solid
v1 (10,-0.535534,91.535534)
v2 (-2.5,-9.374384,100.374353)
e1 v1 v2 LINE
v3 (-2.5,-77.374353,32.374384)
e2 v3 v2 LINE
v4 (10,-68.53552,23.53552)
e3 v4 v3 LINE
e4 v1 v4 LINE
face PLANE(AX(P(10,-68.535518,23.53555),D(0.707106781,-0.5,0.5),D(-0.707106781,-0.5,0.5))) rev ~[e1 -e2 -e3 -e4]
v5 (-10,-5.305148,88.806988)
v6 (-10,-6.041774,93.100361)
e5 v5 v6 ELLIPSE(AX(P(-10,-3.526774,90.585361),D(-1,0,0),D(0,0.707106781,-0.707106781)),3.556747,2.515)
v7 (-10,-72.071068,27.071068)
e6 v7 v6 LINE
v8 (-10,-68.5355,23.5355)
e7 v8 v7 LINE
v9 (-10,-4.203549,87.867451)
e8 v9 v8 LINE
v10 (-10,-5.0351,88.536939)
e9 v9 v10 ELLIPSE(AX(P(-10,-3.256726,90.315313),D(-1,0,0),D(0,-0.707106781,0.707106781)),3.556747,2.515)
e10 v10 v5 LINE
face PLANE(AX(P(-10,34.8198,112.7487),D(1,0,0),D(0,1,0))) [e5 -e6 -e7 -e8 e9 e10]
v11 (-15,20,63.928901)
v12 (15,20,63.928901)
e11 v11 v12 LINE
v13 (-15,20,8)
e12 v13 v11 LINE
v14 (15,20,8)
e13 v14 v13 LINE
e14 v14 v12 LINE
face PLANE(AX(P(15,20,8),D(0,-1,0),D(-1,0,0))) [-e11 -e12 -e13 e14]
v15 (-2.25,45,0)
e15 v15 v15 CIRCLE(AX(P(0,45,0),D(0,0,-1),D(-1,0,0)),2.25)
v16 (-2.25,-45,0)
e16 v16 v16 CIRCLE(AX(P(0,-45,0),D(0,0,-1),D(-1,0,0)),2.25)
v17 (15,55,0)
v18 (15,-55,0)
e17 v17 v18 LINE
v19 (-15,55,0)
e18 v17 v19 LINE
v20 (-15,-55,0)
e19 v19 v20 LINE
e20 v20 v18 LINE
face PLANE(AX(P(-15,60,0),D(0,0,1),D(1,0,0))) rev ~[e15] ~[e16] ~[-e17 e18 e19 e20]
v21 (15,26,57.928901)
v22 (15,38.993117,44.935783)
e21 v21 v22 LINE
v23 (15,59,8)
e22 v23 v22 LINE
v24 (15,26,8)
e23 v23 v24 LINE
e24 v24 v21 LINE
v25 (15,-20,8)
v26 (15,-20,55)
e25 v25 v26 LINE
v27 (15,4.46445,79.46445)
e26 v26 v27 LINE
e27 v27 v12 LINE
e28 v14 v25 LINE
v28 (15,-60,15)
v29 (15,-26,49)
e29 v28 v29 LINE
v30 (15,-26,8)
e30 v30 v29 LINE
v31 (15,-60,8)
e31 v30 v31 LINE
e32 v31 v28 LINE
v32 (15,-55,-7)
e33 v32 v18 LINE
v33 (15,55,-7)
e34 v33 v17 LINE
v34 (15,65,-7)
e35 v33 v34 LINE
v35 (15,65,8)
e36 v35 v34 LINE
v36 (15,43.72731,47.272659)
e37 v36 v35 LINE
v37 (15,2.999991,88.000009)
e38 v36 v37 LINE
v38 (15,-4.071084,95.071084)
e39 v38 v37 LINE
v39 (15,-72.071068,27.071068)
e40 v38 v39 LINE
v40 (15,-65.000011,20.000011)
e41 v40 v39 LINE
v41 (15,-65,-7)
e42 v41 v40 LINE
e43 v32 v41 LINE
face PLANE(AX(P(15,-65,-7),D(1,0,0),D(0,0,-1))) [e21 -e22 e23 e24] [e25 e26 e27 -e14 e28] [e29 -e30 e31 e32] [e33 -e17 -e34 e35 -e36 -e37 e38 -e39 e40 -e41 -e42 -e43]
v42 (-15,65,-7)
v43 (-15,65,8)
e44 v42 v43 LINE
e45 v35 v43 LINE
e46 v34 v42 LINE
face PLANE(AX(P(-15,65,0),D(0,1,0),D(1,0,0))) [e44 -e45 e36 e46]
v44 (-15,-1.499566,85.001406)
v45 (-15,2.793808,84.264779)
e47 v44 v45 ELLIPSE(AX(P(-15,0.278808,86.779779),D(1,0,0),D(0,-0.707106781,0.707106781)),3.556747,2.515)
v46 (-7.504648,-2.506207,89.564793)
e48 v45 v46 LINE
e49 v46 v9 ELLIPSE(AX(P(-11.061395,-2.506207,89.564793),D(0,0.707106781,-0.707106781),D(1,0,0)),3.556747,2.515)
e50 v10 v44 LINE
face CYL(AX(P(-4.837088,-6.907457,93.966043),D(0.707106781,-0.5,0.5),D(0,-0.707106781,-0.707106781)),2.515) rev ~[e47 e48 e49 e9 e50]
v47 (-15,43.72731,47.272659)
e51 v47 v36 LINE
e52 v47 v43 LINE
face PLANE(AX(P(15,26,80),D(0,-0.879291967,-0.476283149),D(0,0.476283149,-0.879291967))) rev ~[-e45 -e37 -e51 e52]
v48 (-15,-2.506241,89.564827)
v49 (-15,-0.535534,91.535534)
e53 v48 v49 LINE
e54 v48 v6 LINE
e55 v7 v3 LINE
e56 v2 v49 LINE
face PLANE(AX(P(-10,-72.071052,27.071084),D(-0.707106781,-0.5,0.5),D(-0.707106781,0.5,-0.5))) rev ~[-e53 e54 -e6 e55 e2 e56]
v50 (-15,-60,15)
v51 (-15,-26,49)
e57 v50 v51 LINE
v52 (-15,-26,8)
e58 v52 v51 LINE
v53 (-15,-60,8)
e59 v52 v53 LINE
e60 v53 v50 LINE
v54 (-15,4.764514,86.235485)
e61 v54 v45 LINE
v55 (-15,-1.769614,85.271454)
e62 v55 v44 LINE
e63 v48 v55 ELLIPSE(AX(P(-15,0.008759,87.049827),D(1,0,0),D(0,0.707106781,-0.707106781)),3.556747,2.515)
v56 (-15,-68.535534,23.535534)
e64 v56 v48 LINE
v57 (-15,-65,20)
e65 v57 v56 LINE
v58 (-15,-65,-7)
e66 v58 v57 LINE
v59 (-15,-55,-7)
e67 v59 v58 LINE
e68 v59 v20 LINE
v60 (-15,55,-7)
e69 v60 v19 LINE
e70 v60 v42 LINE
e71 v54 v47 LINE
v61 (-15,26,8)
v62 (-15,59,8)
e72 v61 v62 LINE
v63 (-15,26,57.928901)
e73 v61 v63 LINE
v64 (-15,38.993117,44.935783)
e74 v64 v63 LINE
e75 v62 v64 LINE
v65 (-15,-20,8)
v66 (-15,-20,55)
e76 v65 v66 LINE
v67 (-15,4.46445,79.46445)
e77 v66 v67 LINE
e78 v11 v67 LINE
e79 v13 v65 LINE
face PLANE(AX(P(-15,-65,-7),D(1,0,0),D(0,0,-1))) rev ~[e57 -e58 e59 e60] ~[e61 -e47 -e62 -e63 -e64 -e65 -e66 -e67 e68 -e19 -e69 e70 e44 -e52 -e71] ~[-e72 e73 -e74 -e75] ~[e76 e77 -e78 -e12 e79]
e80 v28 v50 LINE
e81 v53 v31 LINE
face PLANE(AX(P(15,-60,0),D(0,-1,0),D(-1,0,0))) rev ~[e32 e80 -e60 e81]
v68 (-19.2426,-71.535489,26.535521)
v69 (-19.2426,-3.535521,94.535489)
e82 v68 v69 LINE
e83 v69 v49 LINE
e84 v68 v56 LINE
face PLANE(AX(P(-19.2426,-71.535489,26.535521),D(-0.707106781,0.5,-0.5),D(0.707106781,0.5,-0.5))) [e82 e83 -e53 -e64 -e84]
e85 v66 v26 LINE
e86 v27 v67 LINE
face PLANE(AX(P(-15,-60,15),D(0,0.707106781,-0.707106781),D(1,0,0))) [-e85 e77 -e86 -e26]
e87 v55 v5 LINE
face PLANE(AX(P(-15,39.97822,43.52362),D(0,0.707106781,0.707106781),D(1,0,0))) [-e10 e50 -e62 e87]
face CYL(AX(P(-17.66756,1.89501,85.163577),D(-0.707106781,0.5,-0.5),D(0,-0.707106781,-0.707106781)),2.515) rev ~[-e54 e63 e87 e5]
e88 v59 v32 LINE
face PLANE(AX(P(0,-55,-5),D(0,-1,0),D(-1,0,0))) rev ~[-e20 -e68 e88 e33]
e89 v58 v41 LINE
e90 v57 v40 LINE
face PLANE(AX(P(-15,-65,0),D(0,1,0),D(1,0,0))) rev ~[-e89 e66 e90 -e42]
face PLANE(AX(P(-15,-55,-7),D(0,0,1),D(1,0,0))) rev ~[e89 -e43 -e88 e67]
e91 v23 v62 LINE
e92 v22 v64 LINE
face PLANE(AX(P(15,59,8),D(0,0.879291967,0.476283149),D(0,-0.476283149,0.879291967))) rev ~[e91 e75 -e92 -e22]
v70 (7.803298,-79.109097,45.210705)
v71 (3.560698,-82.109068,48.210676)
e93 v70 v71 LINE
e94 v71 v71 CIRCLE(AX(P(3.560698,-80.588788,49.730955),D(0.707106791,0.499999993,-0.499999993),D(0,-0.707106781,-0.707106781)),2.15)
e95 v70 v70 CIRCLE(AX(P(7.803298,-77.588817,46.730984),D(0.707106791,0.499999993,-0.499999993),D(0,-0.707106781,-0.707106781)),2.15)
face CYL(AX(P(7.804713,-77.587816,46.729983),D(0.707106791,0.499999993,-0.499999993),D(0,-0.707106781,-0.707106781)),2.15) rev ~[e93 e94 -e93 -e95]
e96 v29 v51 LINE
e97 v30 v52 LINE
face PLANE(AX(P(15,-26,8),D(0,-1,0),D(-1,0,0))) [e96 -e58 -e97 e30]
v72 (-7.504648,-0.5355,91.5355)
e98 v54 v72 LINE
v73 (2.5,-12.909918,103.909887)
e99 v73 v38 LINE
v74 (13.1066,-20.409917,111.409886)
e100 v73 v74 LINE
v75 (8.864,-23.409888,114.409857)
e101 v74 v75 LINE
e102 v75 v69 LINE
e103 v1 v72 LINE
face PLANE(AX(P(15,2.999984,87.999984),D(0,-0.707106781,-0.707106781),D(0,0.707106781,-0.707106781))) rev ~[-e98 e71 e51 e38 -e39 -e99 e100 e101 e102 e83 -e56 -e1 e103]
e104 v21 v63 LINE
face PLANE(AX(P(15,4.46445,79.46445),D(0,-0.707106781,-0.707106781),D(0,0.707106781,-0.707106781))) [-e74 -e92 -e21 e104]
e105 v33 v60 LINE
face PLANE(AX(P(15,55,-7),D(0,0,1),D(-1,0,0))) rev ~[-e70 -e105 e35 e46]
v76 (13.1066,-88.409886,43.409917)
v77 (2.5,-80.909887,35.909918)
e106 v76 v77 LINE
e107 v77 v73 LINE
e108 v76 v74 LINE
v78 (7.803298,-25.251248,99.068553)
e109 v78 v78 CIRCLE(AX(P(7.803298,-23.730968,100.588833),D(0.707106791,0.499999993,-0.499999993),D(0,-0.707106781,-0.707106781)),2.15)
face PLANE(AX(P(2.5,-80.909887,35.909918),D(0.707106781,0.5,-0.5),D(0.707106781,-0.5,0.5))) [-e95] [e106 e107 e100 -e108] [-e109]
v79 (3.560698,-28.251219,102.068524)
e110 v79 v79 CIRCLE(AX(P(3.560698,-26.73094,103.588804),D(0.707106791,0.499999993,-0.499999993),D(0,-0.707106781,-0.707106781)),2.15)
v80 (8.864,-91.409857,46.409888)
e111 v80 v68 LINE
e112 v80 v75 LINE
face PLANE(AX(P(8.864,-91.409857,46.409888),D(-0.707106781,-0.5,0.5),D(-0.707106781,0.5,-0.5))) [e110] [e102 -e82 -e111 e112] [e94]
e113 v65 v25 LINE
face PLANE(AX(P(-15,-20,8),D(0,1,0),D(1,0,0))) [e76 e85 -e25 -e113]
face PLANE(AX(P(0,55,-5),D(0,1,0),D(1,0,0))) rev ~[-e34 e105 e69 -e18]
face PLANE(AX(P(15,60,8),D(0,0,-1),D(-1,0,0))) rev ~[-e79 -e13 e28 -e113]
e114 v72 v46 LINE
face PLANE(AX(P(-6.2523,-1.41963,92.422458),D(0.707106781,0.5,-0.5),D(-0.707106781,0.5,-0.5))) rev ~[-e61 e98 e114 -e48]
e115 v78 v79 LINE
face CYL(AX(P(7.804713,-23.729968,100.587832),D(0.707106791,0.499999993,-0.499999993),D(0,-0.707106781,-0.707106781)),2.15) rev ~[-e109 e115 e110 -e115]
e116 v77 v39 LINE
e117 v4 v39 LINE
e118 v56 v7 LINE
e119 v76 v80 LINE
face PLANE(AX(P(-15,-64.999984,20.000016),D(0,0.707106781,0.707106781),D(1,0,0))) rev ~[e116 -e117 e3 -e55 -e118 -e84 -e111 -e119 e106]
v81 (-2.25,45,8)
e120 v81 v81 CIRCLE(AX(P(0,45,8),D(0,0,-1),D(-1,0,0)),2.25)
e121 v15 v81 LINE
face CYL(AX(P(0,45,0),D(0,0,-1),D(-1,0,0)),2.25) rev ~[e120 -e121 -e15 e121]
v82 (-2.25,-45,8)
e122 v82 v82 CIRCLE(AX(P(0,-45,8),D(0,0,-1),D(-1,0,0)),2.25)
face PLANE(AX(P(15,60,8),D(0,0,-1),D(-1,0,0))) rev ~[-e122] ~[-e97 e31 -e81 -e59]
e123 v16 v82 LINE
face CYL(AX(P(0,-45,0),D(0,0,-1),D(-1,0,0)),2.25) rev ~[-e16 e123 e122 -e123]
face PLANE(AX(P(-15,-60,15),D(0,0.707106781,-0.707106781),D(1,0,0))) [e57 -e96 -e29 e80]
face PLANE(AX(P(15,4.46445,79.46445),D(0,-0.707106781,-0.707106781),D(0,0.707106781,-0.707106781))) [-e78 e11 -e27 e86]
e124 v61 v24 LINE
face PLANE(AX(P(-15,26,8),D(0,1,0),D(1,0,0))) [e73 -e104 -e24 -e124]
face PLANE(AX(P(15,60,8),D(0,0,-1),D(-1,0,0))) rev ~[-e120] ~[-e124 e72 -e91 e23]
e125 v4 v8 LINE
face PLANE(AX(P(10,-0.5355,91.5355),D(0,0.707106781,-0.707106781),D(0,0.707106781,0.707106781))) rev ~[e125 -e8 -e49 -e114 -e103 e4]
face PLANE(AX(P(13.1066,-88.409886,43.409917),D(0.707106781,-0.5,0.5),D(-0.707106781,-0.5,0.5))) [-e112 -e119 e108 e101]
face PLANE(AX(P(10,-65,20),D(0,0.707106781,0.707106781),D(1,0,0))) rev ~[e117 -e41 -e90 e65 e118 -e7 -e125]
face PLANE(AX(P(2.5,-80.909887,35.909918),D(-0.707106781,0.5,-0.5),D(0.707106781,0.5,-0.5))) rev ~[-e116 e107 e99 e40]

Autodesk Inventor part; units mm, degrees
ref_plane "YZ Plane" through (0, 0, 0) normal (1, 0, 0) x (0, 1, 0)
ref_plane "XZ Plane" through (0, 0, 0) normal (0, 1, 0) x (-1, 0, 0)
ref_plane "XY Plane" through (0, 0, 0) normal (0, 0, 1) x (1, 0, 0)
ref_plane "Arbeitsebene1" through (0, 0, 0) normal (0, 0, 1) x (1, 0, 0)
sketch "Skizze1" plane through (0, 0, 0) normal (0, 0, 1) x (1, 0, 0)
  line L0 (15, 55) -> (-15, 55) projected
  line L1 (-15, 55) -> (-15, -55) projected
  line L2 (-15, -55) -> (15, -55) projected
  line L3 (15, -55) -> (15, 55) projected
  circle A0 centre (0, 45) radius 5 projected
  circle A1 centre (0, -45) radius 5 projected
  line L4 (15, 55) -> (-15, 55) projected
  line L5 (-15, 55) -> (-15, -55) projected
  line L6 (-15, -55) -> (15, -55) projected
  line L7 (15, -55) -> (15, 55) projected
  circle A2 centre (0, 45) radius 5 projected
  circle A3 centre (0, -45) radius 5 projected
  point P0 (0, 0)
ref_plane "Arbeitsebene2" through (0, -55, -5) normal (0, -1, 0) x (-1, 0, 0)
sketch "Skizze2" plane through (0, -55, -5) normal (0, -1, 0) x (-1, 0, 0)
  line L0 (15, 2) -> (-15, 2) projected
  line L1 (-15, 2) -> (-15, -2) projected
  line L2 (-15, -2) -> (-15, -5) projected
  line L3 (15, -5) -> (-15, -5) projected
  line L4 (15, 2) -> (15, -5) projected
  point P0 (0, -5)
extrude "Extrusion1" add sketch "Skizze2" along normal blind 10
sketch "Skizze3" plane through (-15, -55, 0) normal (0, 0, 1) x (1, 0, 0)
  line L0 (0, -10) -> (30, -10) projected
  line L1 (30, 0) -> (30, -10) projected
  line L2 (0, -10) -> (30, -10)
  line L3 (30, -10) -> (30, -5)
  line L4 (30, -5) -> (0, -5)
  line L5 (0, -5) -> (0, -10)
  point P0 (15, 55)
  dimension "d2" = 5
ref_plane "Arbeitsebene3" through (0, 55, -5) normal (0, 1, 0) x (1, 0, 0)
sketch "Skizze4" plane through (0, 55, -5) normal (0, 1, 0) x (1, 0, 0)
  line L0 (15, 2) -> (15, -5) projected
  line L1 (15, 2) -> (-15, 2) projected
  line L2 (-15, 2) -> (-15, -5) projected
  line L3 (15, -5) -> (-15, -5) projected
  point P0 (0, -5)
extrude "Extrusion2" add sketch "Skizze4" along normal blind 10
sketch "Skizze5" plane through (-15, 55, 0) normal (0, 0, 1) x (1, 0, 0)
  line L0 (0, 10) -> (30, 10) projected
  line L1 (0, 0) -> (0, 10) projected
  line L2 (30, 10) -> (0, 10)
  line L3 (0, 10) -> (0, 5)
  line L4 (0, 5) -> (30, 5)
  line L5 (30, 5) -> (30, 10)
  point P0 (15, -55)
  dimension "d5" = 5
extrude "Extrusion3" add sketch "Skizze3" along normal blind 20
sketch "Skizze6" plane through (15, -55, 0) normal (1, 0, 0) x (0, 0, -1)
  line L0 (7, -10) -> (-20, -10) projected
  line L1 (-20, -10) -> (-15, -5)
  line L2 (0, -5) -> (-20, -5) projected
  line L3 (-20, -10) -> (-12.9289, -10) construction
  line L4 (-20, -5) -> (-20, -10)
  point P0 (0, 55)
  dimension "d8" = 45
extrude "Extrusion4" cut sketch "Skizze6" against normal blind 46
sketch "Skizze7" plane through (-15, -60, 15) normal (0, 0.7071068, 0.7071068) x (1, 0, 0)
  line L0 (0, -7.0711) -> (0, 0) projected
  line L1 (0, -7.0711) -> (30, -7.0711) projected
  line L2 (30, 0) -> (30, -7.0711) projected
  line L3 (0, 0) -> (30, 0) projected
  point P0 (15, 53.033)
extrude "Extrusion5" add sketch "Skizze7" along normal blind 166
extrude "Extrusion6" add sketch "Skizze5" along normal blind 166
sketch "Skizze8" plane through (-15, 60, 0) normal (0, -1, 0) x (1, 0, 0)
  line L0 (30, 0) -> (0, 0) projected
  line L1 (30, 0) -> (30, 166) projected
  line L2 (0, 166) -> (30, 166) projected
  line L3 (0, 0) -> (0, 166) projected
  line L4 (0, 0) -> (0, 80)
  line L5 (0, 0) -> (0, 166) projected
  line L6 (0, 80) -> (30, 80)
  line L7 (0, 80) -> (30, 80)
  line L8 (30, 80) -> (30, 88)
  line L9 (30, 88) -> (0, 88)
  line L10 (0, 88) -> (0, 80)
  point P0 (15, 0)
  dimension "d15" = 80
  dimension "d16" = 8
extrude "Extrusion7" add sketch "Skizze8" along normal blind 57 contours L6 L3 L9 L1
sketch "Skizze9" plane through (-15, -65, -7) normal (-1, 0, 0) x (0, 0, 1)
  line L0 (27, 0) -> (144.3797, 117.3797) projected
  line L1 (139.3797, 122.3797) -> (144.3797, 117.3797) projected
  line L2 (95, 78) -> (139.3797, 122.3797) projected
  line L3 (95, 125) -> (95, 78) projected
  line L4 (95, 125) -> (173, 125) projected
  line L5 (173, 130) -> (173, 125) projected
  line L6 (0, 130) -> (173, 130) projected
  line L7 (0, 120) -> (0, 130) projected
  line L8 (0, 120) -> (7, 120) projected
  line L9 (7, 120) -> (7, 125) projected
  line L10 (7, 125) -> (87, 125) projected
  line L11 (87, 125) -> (87, 70) projected
  line L12 (22, 5) -> (87, 70) projected
  line L13 (7, 5) -> (22, 5) projected
  line L14 (7, 10) -> (7, 5) projected
  line L15 (7, 10) -> (0, 10) projected
  line L16 (0, 10) -> (0, 0) projected
  line L17 (0, 0) -> (27, 0) projected
  line L18 (95, 125) -> (95, 130)
  line L19 (95, 125) -> (95, 78) projected
  line L20 (95, 78) -> (95, 68)
  point P0 (7, 65)
extrude "Extrusion8" cut sketch "Skizze9" against normal blind 61.5 contours L20 L2 L1 L0 | L18 L6 L5 L4
sketch "Skizze10" plane through (-15, 60, 0) normal (0, -1, 0) x (1, 0, 0)
  line L0 (30, 0) -> (30, 80) projected
  line L1 (0, 0) -> (30, 0)
  line L2 (30, 0) -> (30, 8)
  line L3 (30, 8) -> (0, 8)
  line L4 (0, 8) -> (0, 0)
  point P0 (15, 0)
  dimension "d21" = 8
extrude "Extrusion9" add sketch "Skizze10" along normal blind 123.5
sketch "Skizze12" plane through (-15, 60, 8) normal (0, 0, 1) x (1, 0, 0)
  line L0 (30, -120) -> (0, -120) projected
  line L1 (30, 0) -> (30, -120) projected
  line L2 (0, 0) -> (30, 0) projected
  line L3 (0, 0) -> (0, -120) projected
  line L4 (15, -60) -> (30, -60)
  line L5 (30, 0) -> (30, -120) projected
  line L6 (30, -60) -> (30, -40)
  line L7 (30, -40) -> (30, -80)
  line L8 (0, 0) -> (0, -120) projected
  line L9 (30, -40) -> (0, -40)
  line L10 (0, -40) -> (0, -34)
  line L11 (0, -34) -> (30, -34)
  line L12 (30, -34) -> (30, -40)
  line L13 (30, -80) -> (0, -80)
  line L14 (0, -80) -> (0, -86)
  line L15 (0, -86) -> (30, -86)
  line L16 (30, -86) -> (30, -80)
  dimension "d26" = 20
  dimension "d27" = 40
  dimension "d28" = 6
  dimension "d29" = 6
extrude "Extrusion11" add sketch "Skizze12" along normal blind 76.5 contours L3 L11 L1 L9
sketch "Skizze13" plane through (-15, -60, 8) normal (0, 0, 1) x (1, 0, 0)
  line L0 (0, 80) -> (0, 40)
  line L1 (0, 80) -> (0, 0) projected
  line L2 (30, 80) -> (30, 0) projected
  line L3 (0, 40) -> (30, 40)
  line L4 (30, 40) -> (30, 34)
  line L5 (30, 34) -> (0, 34)
  line L6 (0, 34) -> (0, 40)
  point P0 (15, 60)
  point P1 (0, 34)
  point P2 (30, 40)
  dimension "d32" = 40
  dimension "d33" = 6
extrude "Extrusion12" add sketch "Skizze13" along normal blind 49.25
sketch "Skizze31" plane through (0, 0, 0) normal (0, 0, 1) x (1, 0, 0)
  point P0 (0, 0)
sketch "Skizze41" plane through (-15, -65, 20) normal (0, -0.7071068, 0.7071068) x (1, 0, 0)
  line L0 (30, 96.1665) -> (0, 96.1665) projected
  line L1 (0, 0) -> (0, 96.1665) projected
  line L2 (0, 0) -> (30, 0) projected
  line L3 (30, 0) -> (30, 96.1665) projected
  line L4 (0, 96.1665) -> (5, 96.1665)
  line L5 (5, 96.1665) -> (5, 0)
  line L6 (5, 0) -> (0, 0)
  line L7 (0, 0) -> (0, 96.1665)
  line L8 (30, 96.1665) -> (0, 96.1665) projected
  line L9 (30, 96.1665) -> (25, 96.1665)
  line L10 (25, 96.1665) -> (25, 0)
  line L11 (25, 0) -> (30, 0)
  line L12 (30, 0) -> (30, 96.1665)
  point P0 (15, 31.8198)
  dimension "d88" = 5
  dimension "d89" = 5
extrude "Extrusion34" add sketch "Skizze41" along normal blind 10 contours L3 L2 L10 L0 | L5 L2 L1 L0
sketch "Skizze42" plane through (-10, -65, 20) normal (0, -0.7071068, -0.7071068) x (-1, 0, 0)
  line L0 (5, 0) -> (0, 0) projected
  line L1 (0, 0) -> (0, -10) projected
  line L2 (5, -10) -> (0, -10) projected
  line L3 (5, 0) -> (5, -10) projected
  line L4 (-20, 0) -> (-25, 0) projected
  line L5 (-25, 0) -> (-25, -10) projected
  line L6 (-20, -10) -> (-25, -10) projected
  line L7 (-20, 0) -> (-20, -10) projected
  line L8 (0, -10) -> (5, -5)
  line L9 (-25, -10) -> (-20, -5)
  point P0 (-10, 60.1041)
extrude "Extrusion35" cut sketch "Skizze42" against normal blind 136 contours L3 L2 L8 | L7 L6 L9
sketch "Skizze43" plane through (-15, 3, 88) normal (0, 0.7071068, 0.7071068) x (1, 0, 0)
  line L0 (0, -5) -> (5, -10) projected
  line L1 (5, 0) -> (5, -10) projected
  line L2 (5, 0) -> (0, 0) projected
  line L3 (0, 0) -> (0, -5) projected
  line L4 (25, -5) -> (30, -10) projected
  line L5 (30, 0) -> (30, -10) projected
  line L6 (30, 0) -> (25, 0) projected
  line L7 (25, 0) -> (25, -5) projected
  point P0 (15, 60.1041)
extrude "Extrusion36" add sketch "Skizze43" along normal blind 45
sketch "Skizze48" plane through (-10, -65, 20) normal (0, -0.7071068, -0.7071068) x (-1, 0, 0)
  point P0 (-10, 60.1041)
sketch "Skizze49" plane through (-10, -65, 20) normal (0, -0.7071068, -0.7071068) x (-1, 0, 0)
  line L0 (-20, 0) -> (-20, -5) projected
  line L1 (-20, 0) -> (-25, 0) projected
  line L2 (-25, 0) -> (-25, -10) projected
  line L3 (5, 0) -> (5, -5) projected
  line L4 (5, 0) -> (0, 0) projected
  line L5 (0, 0) -> (0, -10) projected
  line L6 (44.1188, -44.1188) -> (39.1188, -49.1188)
  line L7 (31.6188, -56.6188) -> (26.6188, -61.6188)
  line L8 (-25, -10) -> (-20, -5) projected
  line L9 (0, -10) -> (5, -5) projected
  point P0 (-10, 60.1041)
extrude "Extrusion41" [suppressed]
sketch "Skizze50" plane through (-15, 34.8198, 119.8198) normal (0, 0.7071068, 0.7071068) x (1, 0, 0)
  line L0 (25, 0) -> (25, -5) projected
  line L1 (5, -10) -> (5, 0) projected
  line L2 (5, 0) -> (0, 0) projected
  line L3 (0, 0) -> (0, -5) projected
  line L4 (30, -10) -> (30, 0) projected
  line L5 (30, 0) -> (25, 0) projected
  line L6 (-34.1188, -49.1188) -> (-39.1188, -44.1188) projected
  line L7 (-21.6188, -61.6188) -> (-26.6188, -56.6188) projected
  line L8 (25, -5) -> (30, -10) projected
  line L9 (0, -5) -> (5, -10) projected
  point P0 (15, 60.1041)
extrude "Extrusion42" [suppressed]
sketch "Skizze51" plane through (15, 3, 88) normal (0, 0.7071068, -0.7071068) x (-1, 0, 0)
  line L0 (0, 0) -> (5, 0) projected
  line L1 (5, 0) -> (5, 45) projected
  line L2 (0, 45) -> (5, 45) projected
  line L3 (0, 0) -> (0, 45) projected
  line L4 (25, 0) -> (30, 0) projected
  line L5 (30, 0) -> (30, 45) projected
  line L6 (25, 45) -> (30, 45) projected
  line L7 (25, 0) -> (25, 45) projected
  line L8 (5, -96.1665) -> (5, 45) projected
  line L9 (0, 45) -> (5, 45)
  line L10 (5, 45) -> (5, 40)
  line L11 (5, 40) -> (0, 40)
  line L12 (0, 40) -> (0, 45)
  line L13 (25, 45) -> (30, 45) projected
  line L14 (25, 45) -> (30, 45)
  line L15 (30, 45) -> (30, 40)
  line L16 (30, 40) -> (25, 40)
  line L17 (25, 40) -> (25, 45)
  point P0 (15, -64.3467)
  point P1 (25, 40)
  point P2 (0, 40)
  point P3 (5, 40)
  dimension "d109" = 5
  dimension "d110" = 5
extrude "Extrusion43" add sketch "Skizze51" along normal blind 10 contours L3 L2 L1 L11 | L7 L6 L5 L16
sketch "Skizze52" plane through (15, -65, 20) normal (1, 0, 0) x (0, 0.7071068, -0.7071068)
  line L0 (0, 0) -> (0, 96.1665) projected
  line L1 (0, 96.1665) -> (0, 136.1665) projected
  line L2 (0, 136.1665) -> (10, 136.1665) projected
  line L3 (10, 141.1665) -> (10, 136.1665) projected
  line L4 (-10, 141.1665) -> (10, 141.1665) projected
  line L5 (-10, 0) -> (-10, 96.1665) projected
  line L6 (0, 0) -> (-10, 0) projected
  line L7 (-5, 141.1665) -> (10, 141.1665) projected
  line L8 (10, 141.1665) -> (5, 136.1665)
  line L9 (-10, 96.1665) -> (-10, 141.1665) projected
  point P0 (60.1041, 31.8198)
extrude "Extrusion44" cut sketch "Skizze52" against normal blind 46.25 contours L8 L3 L2
sketch "Skizze53" plane through (15, 34.8198, 112.7487) normal (0, 0, -1) x (-1, 0, 0)
  line L0 (5, 7.0711) -> (5, 0) projected
  line L1 (5, 7.0711) -> (0, 7.0711) projected
  line L2 (0, 0) -> (0, 7.0711) projected
  line L3 (5, 0) -> (0, 0) projected
  line L4 (25, 0) -> (25, 7.0711) projected
  line L5 (30, 0) -> (25, 0) projected
  line L6 (30, 7.0711) -> (30, 0) projected
  line L7 (30, 7.0711) -> (25, 7.0711) projected
  point P0 (15, -34.8198)
extrude "Extrusion45" add sketch "Skizze53" along normal blind 29.25
sketch "Skizze55" plane through (10, 34.8198, 112.7487) normal (0, -1, 0) x (1, 0, 0)
  line L0 (-20, -24.7487) -> (-25, -24.7487) projected
  line L1 (-20, 0) -> (-20, -24.7487) projected
  line L2 (-25, 0) -> (-20, 0) projected
  line L3 (-25, 0) -> (-25, -24.7487) projected
  line L4 (5, -24.7487) -> (0, -24.7487) projected
  line L5 (5, 0) -> (5, -24.7487) projected
  line L6 (0, 0) -> (5, 0) projected
  line L7 (0, 0) -> (0, -24.7487) projected
  line L8 (5, 0) -> (5, -24.7487) projected
  line L9 (0, 0) -> (0, -24.7487) projected
  line L10 (5, -12.3744) -> (0, -12.3744)
  line L11 (0, -12.3744) -> (0, -7.3744)
  line L12 (0, -7.3744) -> (5, -7.3744)
  line L13 (5, -7.3744) -> (5, -12.3744)
  line L14 (-20, 0) -> (-20, -24.7487) projected
  line L15 (-25, 0) -> (-25, -24.7487) projected
  line L16 (-20, -12.3744) -> (-25, -12.3744)
  line L17 (-25, -12.3744) -> (-25, -17.3744)
  line L18 (-25, -17.3744) -> (-20, -17.3744)
  line L19 (-20, -17.3744) -> (-20, -12.3744)
  line L20 (5, -12.3744) -> (0, -12.3744)
  line L21 (0, -12.3744) -> (0, -17.3744)
  line L22 (0, -17.3744) -> (5, -17.3744)
  line L23 (5, -17.3744) -> (5, -12.3744)
  point P0 (-10, -112.7487)
  point P1 (0, -17.3744)
  point P2 (5, -17.3744)
  point P3 (5, -12.3744)
  point P4 (0, -12.3744)
  point P5 (-25, -17.3744)
  point P6 (-20, -17.3744)
  point P7 (-20, -12.3744)
  point P8 (-25, -12.3744)
  dimension "d124" = 5
  dimension "d125" = 5
extrude "Extrusion47" add sketch "Skizze55" along normal blind 26 contours L18 L3 L16 L1 | L22 L7 L10 L5
sketch "Skizze57" plane through (10, 34.8198, 88) normal (-1, 0, 0) x (0, 0, 1)
  line L0 (24.7487, 0) -> (12.3744, 0) projected
  line L1 (28.2843, -3.5355) -> (24.7487, 0) projected
  line L2 (12.3744, -19.4454) -> (28.2843, -3.5355) projected
  line L3 (12.3744, 0) -> (12.3744, -19.4454) projected
  line L4 (7.3744, 0) -> (7.3744, -24.4454) projected
  line L5 (0, -31.8198) -> (7.3744, -24.4454) projected
  line L6 (-68, -99.8198) -> (0, -31.8198) projected
  line L7 (-68, -99.8198) -> (-64.4645, -103.3553) projected
  line L8 (35.3553, -3.5355) -> (24.7487, 7.0711) projected
  line L9 (24.7487, 7.0711) -> (0, 7.0711) projected
  line L10 (0, 0) -> (0, 7.0711) projected
  line L11 (7.3744, 0) -> (0, 0) projected
  line L12 (35.3553, -3.5355) -> (31.8198, -7.0711)
  line L13 (31.8198, -7.0711) -> (28.2843, -3.5355)
  line L14 (28.2843, -3.5355) -> (31.8198, 0)
  line L15 (12.3744, 0) -> (7.3744, 0)
  line L16 (7.3744, 0) -> (7.3744, 7.0711)
  line L17 (7.3744, 7.0711) -> (12.3744, 7.0711)
  line L18 (12.3744, 7.0711) -> (12.3744, 0)
  line L19 (-64.4645, -103.3553) -> (3.5355, -35.3553) projected
  line L20 (3.5355, -35.3553) -> (35.3553, -3.5355) projected
  point P0 (-88, -34.8198)
  point P1 (12.3744, 7.0711)
  point P2 (31.8198, -7.0711)
  dimension "d138" = 5
extrude "Extrusion49" add sketch "Skizze57" along normal blind 23.5
sketch "Skizze73" plane through (15, -65, -7) normal (1, 0, 0) x (0, 0, -1)
  line L0 (-15, 91) -> (-87, 91) projected
  line L1 (-87, 125) -> (-87, 91) projected
  line L2 (-15, 125) -> (-87, 125) projected
  line L3 (-15, 125) -> (-15, 91) projected
  line L4 (-95, 106.8909) -> (-95, 99.8198) projected
  line L5 (-95, 99.8198) -> (-95, 78) projected
  line L6 (-87, 70) -> (-95, 78) projected
  line L7 (-87, 85) -> (-87, 70) projected
  line L8 (-15, 85) -> (-87, 85) projected
  line L9 (-15, 85) -> (-15, 45) projected
  line L10 (-15, 45) -> (-62, 45) projected
  line L11 (-56, 39) -> (-62, 45) projected
  line L12 (-15, 39) -> (-56, 39) projected
  line L13 (-15, 39) -> (-15, 5) projected
  line L14 (-15, 5) -> (-22, 5) projected
  line L15 (-22, 5) -> (-27, 0) projected
  line L16 (0, 0) -> (-27, 0) projected
  line L17 (0, 10) -> (0, 0) projected
  line L18 (0, 10) -> (-7, 10) projected
  line L19 (-7, 120) -> (-7, 10) projected
  line L20 (-7, 120) -> (0, 120) projected
  line L21 (0, 120) -> (0, 130) projected
  line L22 (0, 130) -> (-95, 130) projected
  line L23 (-95, 130) -> (-95, 106.8909) projected
  line L24 (-95, 106.8909) -> (-95, 99.8198) projected
  line L25 (-119.7487, 106.8909) -> (-95, 106.8909) projected
  line L26 (-119.7487, 99.8198) -> (-119.7487, 106.8909) projected
  line L27 (-119.7487, 99.8198) -> (-107.3744, 99.8198) projected
  line L28 (-107.3744, 99.8198) -> (-102.3744, 99.8198) projected
  line L29 (-102.3744, 99.8198) -> (-95, 99.8198) projected
  line L30 (-102.3744, 75.3744) -> (-107.3744, 80.3744) projected
  line L31 (-107.3744, 80.3744) -> (-123.2843, 96.2843) projected
  line L32 (-123.2843, 96.2843) -> (-119.7487, 99.8198) projected
  line L33 (-119.7487, 99.8198) -> (-119.7487, 106.8909) projected
  line L34 (-133.8909, 92.7487) -> (-119.7487, 106.8909) projected
  line L35 (-102.0711, 60.9289) -> (-133.8909, 92.7487) projected
  line L36 (-34.0711, -7.0711) -> (-102.0711, 60.9289) projected
  line L37 (-27, 0) -> (-34.0711, -7.0711) projected
  line L38 (-27, 0) -> (-95, 68) projected
  line L39 (-95, 68) -> (-102.3744, 75.3744) projected
  line L40 (-102.3744, 75.3744) -> (-107.3744, 80.3744) projected
  line L41 (-102.3744, 99.8198) -> (-102.3744, 75.3744) projected
  line L42 (-107.3744, 99.8198) -> (-102.3744, 99.8198) projected
  line L43 (-107.3744, 99.8198) -> (-107.3744, 80.3744) projected
  line L44 (-15, 125) -> (-15, 130)
  line L45 (-87, 125) -> (-87, 91) projected
  line L46 (-87, 91) -> (-109.5711, 68.4289)
  point P0 (-7, 65)
  point P1 (-95, 83)
  point P2 (-102.5, 75.5)
extrude "Extrusion64" cut sketch "Skizze73" against normal blind 119 contours L46 L5 L4 L23 L22 L44 L2 L1 | L29 L28 L27 L26 L25 L4 | L46 L30 L43 L28 L41 | L41 L30 L46 | L46 L35 L34 L26 L32 L31 L30 | L43 L31 L32 L27
sketch "Skizze74" plane through (15, -65, -7) normal (1, 0, 0) x (0, 0, -1)
  line L0 (-15, 91) -> (-87, 91) projected
  line L1 (-15, 91) -> (-15, 130) projected
  line L2 (-87, 91) -> (-15, 130)
  line L3 (-15, 130) -> (-87, 91)
  line L4 (-87, 91) -> (-82, 91)
  line L5 (-15, 130) -> (-15, 124)
  line L6 (-15, 130) -> (-15, 91) projected
  line L7 (-15, 91) -> (-87, 91) projected
  line L8 (-87, 91) -> (-95, 83) projected
  line L9 (-95, 83) -> (-95, 78) projected
  line L10 (-87, 70) -> (-95, 78) projected
  line L11 (-87, 85) -> (-87, 70) projected
  line L12 (-15, 85) -> (-87, 85) projected
  line L13 (-15, 85) -> (-15, 45) projected
  line L14 (-15, 45) -> (-62, 45) projected
  line L15 (-56, 39) -> (-62, 45) projected
  line L16 (-15, 39) -> (-56, 39) projected
  line L17 (-15, 39) -> (-15, 5) projected
  line L18 (-15, 5) -> (-22, 5) projected
  line L19 (-22, 5) -> (-27, 0) projected
  line L20 (0, 0) -> (-27, 0) projected
  line L21 (0, 10) -> (0, 0) projected
  line L22 (0, 10) -> (-7, 10) projected
  line L23 (-7, 120) -> (-7, 10) projected
  line L24 (-7, 120) -> (0, 120) projected
  line L25 (0, 120) -> (0, 130) projected
  line L26 (0, 130) -> (-15, 130) projected
  line L27 (-15, 124) -> (-87, 85)
  point P0 (-7, 65)
  point P1 (-75.9231, 91)
  dimension "d195" = 5
  dimension "d196" = 6
extrude "Extrusion65" add sketch "Skizze74" against normal blind 30 contours L0 L2 L1 L27
sketch "Skizze75" plane through (-15, -65, -7) normal (-1, 0, 0) x (0, 0, 1)
  line L0 (15, 91) -> (75.9231, 91) projected
  line L1 (15, 91) -> (15, 124) projected
  line L2 (15, 124) -> (75.9231, 91) projected
  line L3 (87, 91) -> (15, 130) projected
  line L4 (0, 130) -> (15, 130) projected
  line L5 (0, 120) -> (0, 130) projected
  line L6 (0, 120) -> (7, 120) projected
  line L7 (7, 120) -> (7, 10) projected
  line L8 (7, 10) -> (0, 10) projected
  line L9 (0, 10) -> (0, 0) projected
  line L10 (0, 0) -> (27, 0) projected
  line L11 (27, 0) -> (30.5355, -3.5355) projected
  line L12 (30.5355, -3.5355) -> (106.0355, 71.9645) projected
  line L13 (106.0355, 71.9645) -> (102.5, 75.5) projected
  line L14 (95, 68) -> (102.5, 75.5) projected
  line L15 (95, 68) -> (95, 83) projected
  line L16 (95, 83) -> (87, 91) projected
  line L17 (15, 85) -> (15, 45) projected
  line L18 (15, 85) -> (87, 85) projected
  line L19 (87, 85) -> (87, 70) projected
  line L20 (62, 45) -> (87, 70) projected
  line L21 (15, 45) -> (62, 45) projected
  line L22 (15, 39) -> (56, 39) projected
  line L23 (22, 5) -> (56, 39) projected
  line L24 (15, 5) -> (22, 5) projected
  line L25 (15, 39) -> (15, 5) projected
  line L26 (109.5711, 68.4289) -> (106.0355, 71.9645) projected
  line L27 (30.5355, -3.5355) -> (106.0355, 71.9645) projected
  line L28 (34.0711, -7.0711) -> (30.5355, -3.5355) projected
  line L29 (34.0711, -7.0711) -> (109.5711, 68.4289) projected
  line L30 (95, 68) -> (102.0711, 60.9289)
  point P0 (7, 65)
extrude "Extrusion66" cut sketch "Skizze75" against normal blind 98.25 contours L14 L13 L12 L30 | L12 L26 L29 L30
sketch "Skizze76" plane through (-15, 3, 88) normal (0, 0.7071068, 0.7071068) x (1, 0, 0)
  line L0 (0, 36.0624) -> (0, 12.0208) projected
  line L1 (30, 0) -> (0, 0) projected
  line L2 (5, -10) -> (0, -5) projected
  line L3 (5, -5) -> (5, -10) projected
  line L4 (25, -5) -> (5, -5) projected
  line L5 (25, -5) -> (30, -10) projected
  line L6 (30, 0) -> (30, -10) projected
  line L7 (30, 0) -> (0, 0) projected
  line L8 (0, -5) -> (0, 0) projected
  line L9 (5, -10) -> (25, -30)
  line L10 (30, -10) -> (25, -5)
  line L11 (25, -5) -> (12.5, -17.5)
  line L12 (12.5, -17.5) -> (17.5, -22.5)
  line L13 (17.5, -22.5) -> (30, -10)
  line L14 (17.5, -22.5) -> (28.1066, -33.1066)
  line L15 (28.1066, -33.1066) -> (23.864, -37.3492)
  line L16 (0, -5) -> (28.1066, -33.1066)
  line L17 (28.1066, -33.1066) -> (23.864, -37.3492)
  line L18 (23.864, -37.3492) -> (-4.2426, -9.2426)
  line L19 (-4.2426, -9.2426) -> (0, -5)
  point P0 (15, 60.1041)
  point P1 (17.5, -22.5)
  point P2 (12.5, -17.5)
  point P3 (25, -30)
  dimension "d201" = 15
  dimension "d202" = 6
extrude "Extrusion67" add sketch "Skizze76" along normal blind 96.25 from surface at -96.1665 contours L13 L9 L11 L5 | L2 L9 L14 L15 L18 L19
sketch "Skizze77" plane through (15, -65, 20) normal (1, 0, 0) x (0, 0.7071068, -0.7071068)
  line L0 (0, 96.1665) -> (-10, 96.1665) projected
  line L1 (-10, 0) -> (-10, 96.1665) projected
  line L2 (0, 0) -> (-10, 0) projected
  line L3 (0, 0) -> (0, 96.1665) projected
  line L4 (-10, 96.1665) -> (-38.8061, 96.1665)
  line L5 (-38.8061, 96.1665) -> (-38.8061, 98.6326)
  line L6 (-38.8061, 98.6326) -> (-10, 98.6326)
  line L7 (-10, 98.6326) -> (-10, 96.1665)
  line L8 (-10, 98.6326) -> (0, 98.6326)
  line L9 (0, 98.6326) -> (0, 96.1665)
  point P0 (60.1041, 31.8198)
extrude "Extrusion68" cut sketch "Skizze77" against normal blind 125.75 contours L0 L7 L8 L9 | L4 L5 L6 L7
sketch "Skizze78" plane through (13.1066, -20.4099, 111.4099) normal (0.7071068, 0.5, -0.5) x (0, -0.7071068, -0.7071068)
  line L0 (0, 15) -> (0, 0) projected
  line L1 (96.1665, 0) -> (0, 0) projected
  line L2 (96.1665, 0) -> (96.1665, 15) projected
  line L3 (96.1665, 15) -> (0, 15) projected
  line L4 (0, 7.5) -> (15, 7.5)
  circle A0 centre (15, 7.5) radius 2.15
  line L5 (96.1665, 7.5) -> (81.1665, 7.5)
  circle A1 centre (81.1665, 7.5) radius 2.15
  line L6 (15, 7.5) -> (30, 7.5)
  circle A2 centre (30, 7.5) radius 2.15
  line L7 (0, 7.5) -> (10, 7.5)
  line L8 (96.1665, 7.5) -> (86.1665, 7.5)
  circle A3 centre (86.1665, 7.5) radius 2.15
  circle A4 centre (10, 7.5) radius 2.15
  point P0 (64.3467, 75.1777)
  dimension "d207" = 15
  dimension "d208" = 4.3
  dimension "d209" = 15
  dimension "d210" = 4.3
  dimension "d218" = 15
  dimension "d219" = 4.3
  dimension "d224" = 10
  dimension "d225" = 10
  dimension "d226" = 4.3
extrude "Extrusion69" cut sketch "Skizze78" against normal blind 125.75 contours L4 A4 | L4 A4 | A3 L5 | L5 A3
sketch "Skizze79" plane through (15, -65, 20) normal (1, 0, 0) x (0, 0.7071068, -0.7071068)
  line L0 (7.0711, 91.9239) -> (7.0711, 103.2376) projected
  line L1 (7.0711, 103.2376) -> (0, 96.1665) projected
  line L2 (0, 0) -> (0, 96.1665) projected
  line L3 (7.0711, 0) -> (0, 0) projected
  line L4 (7.0711, 0) -> (7.0711, 48.0833) projected
  line L5 (7.0711, 48.0833) -> (7.0711, 56.5685) projected
  line L6 (7.0711, 56.5685) -> (7.0711, 91.9239) projected
  line L7 (-5, 0) -> (-5, 96.1665) projected
  line L8 (72.832, 55.8614) -> (29.7529, 98.9406) projected
  line L9 (29.7529, 98.9406) -> (96.1665, 79.196) projected
  line L10 (96.1665, 79.196) -> (72.832, 55.8614) projected
  line L11 (68.5894, 51.6188) -> (17.6777, 102.5305) projected
  line L12 (68.5894, 51.6188) -> (40.3051, 23.3345) projected
  line L13 (40.3051, 23.3345) -> (7.0711, 56.5685) projected
  line L14 (7.0711, 48.0833) -> (7.0711, 56.5685) projected
  line L15 (36.0624, 19.0919) -> (7.0711, 48.0833) projected
  line L16 (36.0624, 19.0919) -> (12.0208, -4.9497) projected
  line L17 (12.0208, -4.9497) -> (7.0711, 0) projected
  line L18 (7.0711, 0) -> (0, 0) projected
  line L19 (19.0919, -19.0919) -> (0, 0) projected
  line L20 (26.163, -12.0208) -> (19.0919, -19.0919) projected
  line L21 (26.163, -12.0208) -> (21.2132, -7.0711) projected
  line L22 (98.9949, 70.7107) -> (21.2132, -7.0711) projected
  line L23 (98.9949, 70.7107) -> (103.9447, 65.7609) projected
  line L24 (103.9447, 65.7609) -> (111.0158, 72.832) projected
  line L25 (111.0158, 72.832) -> (100.4092, 83.4386) projected
  line L26 (100.4092, 83.4386) -> (21.9203, 106.7731) projected
  line L27 (21.9203, 106.7731) -> (10.6066, 106.7731) projected
  line L28 (10.6066, 106.7731) -> (7.0711, 103.2376) projected
  line L29 (7.0711, 91.9239) -> (7.0711, 103.2376) projected
  line L30 (17.6777, 102.5305) -> (7.0711, 91.9239) projected
  line L31 (0, 96.1665) -> (89.9839, 96.1665)
  line L32 (89.9839, 96.1665) -> (89.9839, 110.1676)
  line L33 (89.9839, 110.1676) -> (0, 110.1676)
  line L34 (0, 110.1676) -> (0, 96.1665)
  point P0 (60.1041, 31.8198)
extrude "Extrusion70" cut sketch "Skizze79" against normal blind 125.75 contours L31 L1 L0 | L0 L28 L27 L26 L31 L9 L8 L11 L30 | L30 L11 L31 | L1 L34 L33 L32 L31 L26 L27 L28 | L8 L9 L31
sketch "Skizze80" plane through (15, -60, 15) normal (1, 0, 0) x (0, 0.7071068, -0.7071068)
  line L0 (0, 96.1665) -> (-7.0711, 96.1665) projected
  line L1 (-7.0711, 0) -> (-7.0711, 96.1665) projected
  line L2 (0, 0) -> (-7.0711, 0) projected
  line L3 (0, 0) -> (0, 48.0833) projected
  line L4 (0, 48.0833) -> (0, 56.5685) projected
  line L5 (0, 56.5685) -> (0, 91.9239) projected
  line L6 (0, 91.9239) -> (0, 96.1665) projected
  line L7 (25.4558, 96.1665) -> (16.9706, 96.1665) projected
  line L8 (61.5183, 51.6188) -> (16.9706, 96.1665) projected
  line L9 (61.5183, 51.6188) -> (33.234, 23.3345) projected
  line L10 (33.234, 23.3345) -> (0, 56.5685) projected
  line L11 (0, 48.0833) -> (0, 56.5685) projected
  line L12 (28.9914, 19.0919) -> (0, 48.0833) projected
  line L13 (28.9914, 19.0919) -> (4.9497, -4.9497) projected
  line L14 (4.9497, -4.9497) -> (0, 0) projected
  line L15 (0, 0) -> (-7.0711, 0) projected
  line L16 (12.0208, -19.0919) -> (-7.0711, 0) projected
  line L17 (19.0919, -12.0208) -> (12.0208, -19.0919) projected
  line L18 (19.0919, -12.0208) -> (14.1421, -7.0711) projected
  line L19 (91.9239, 70.7107) -> (14.1421, -7.0711) projected
  line L20 (91.9239, 70.7107) -> (96.8736, 65.7609) projected
  line L21 (96.8736, 65.7609) -> (103.9447, 72.832) projected
  line L22 (103.9447, 72.832) -> (93.3381, 83.4386) projected
  line L23 (93.3381, 83.4386) -> (50.526, 96.1665) projected
  line L24 (50.526, 96.1665) -> (32.0127, 96.1665) projected
  line L25 (32.0127, 96.1665) -> (89.0955, 79.196) projected
  line L26 (89.0955, 79.196) -> (65.7609, 55.8614) projected
  line L27 (65.7609, 55.8614) -> (25.4558, 96.1665) projected
  line L28 (4.2426, 96.1665) -> (0, 96.1665) projected
  line L29 (0, 91.9239) -> (0, 96.1665) projected
  line L30 (4.2426, 96.1665) -> (0, 91.9239) projected
  line L31 (0, 96.1665) -> (0, 91.1665)
  line L32 (0, 91.1665) -> (50.526, 91.1665)
  line L33 (50.526, 91.1665) -> (50.526, 96.1665)
  line L34 (50.526, 96.1665) -> (0, 96.1665)
  point P0 (53.033, 31.8198)
  point P1 (32.0127, 96.1665)
  point P2 (25.4558, 96.1665)
  point P3 (16.9706, 96.1665)
  point P4 (4.2426, 96.1665)
  point P5 (0, 96.1665)
  dimension "d215" = 5
extrude "Extrusion71" add sketch "Skizze80" against normal blind 30 contours L28 L30 L6 | L30 L34 L8 L32 L5 | L7 L27 L32 L8 | L34 L25 L32 L27 | L24 L33 L32 L25
sketch "Skizze81" plane through (15, 55, 0) normal (0, 0, -1) x (-1, 0, 0)
  circle A0 centre (15, -10) radius 2.25
  circle A1 centre (15, -100) radius 2.25
  point P0 (15, -55)
  dimension "d220" = 4.5
  dimension "d221" = 4.5
extrude "Extrusion72" cut sketch "Skizze81" against normal blind 24.5
sketch "Skizze82" plane through (-15, 43.7273, 47.2727) normal (0, 0.7071068, 0.7071068) x (1, 0, 0)
  line L0 (-4.2426, -66.8397) -> (0, -62.5971) projected
  line L1 (0, -62.5971) -> (0, -46.2834) projected
  line L2 (5, -62.5971) -> (5, -67.5971) projected
  line L3 (0, -62.5971) -> (5, -67.5971)
  line L4 (0, -62.5971) -> (5, -67.5971)
  line L5 (5, -67.5971) -> (8.7477, -63.8494)
  line L6 (8.7477, -63.8494) -> (3.7477, -58.8494)
  line L7 (3.7477, -58.8494) -> (0, -62.5971)
  line L8 (3.7477, -58.8494) -> (0, -62.5971)
  line L9 (0, -62.5971) -> (-4.4106, -58.1865)
  line L10 (-4.4106, -58.1865) -> (-0.6629, -54.4388)
  line L11 (-0.6629, -54.4388) -> (3.7477, -58.8494)
  point P0 (15, 2.507)
  point P1 (0, -55.1017)
  dimension "d227" = 5.3
extrude "Extrusion73" cut sketch "Skizze82" against normal blind 5.3 contours L7 L6 L5 L3 | L1 L11 L7
fillet "Rundung1" radius 2.515 2 edges at (-12.5, -6.0524, 89.5542) (-11.2523, -1.6346, 85.1365)
properties part number "HalterungIso"
